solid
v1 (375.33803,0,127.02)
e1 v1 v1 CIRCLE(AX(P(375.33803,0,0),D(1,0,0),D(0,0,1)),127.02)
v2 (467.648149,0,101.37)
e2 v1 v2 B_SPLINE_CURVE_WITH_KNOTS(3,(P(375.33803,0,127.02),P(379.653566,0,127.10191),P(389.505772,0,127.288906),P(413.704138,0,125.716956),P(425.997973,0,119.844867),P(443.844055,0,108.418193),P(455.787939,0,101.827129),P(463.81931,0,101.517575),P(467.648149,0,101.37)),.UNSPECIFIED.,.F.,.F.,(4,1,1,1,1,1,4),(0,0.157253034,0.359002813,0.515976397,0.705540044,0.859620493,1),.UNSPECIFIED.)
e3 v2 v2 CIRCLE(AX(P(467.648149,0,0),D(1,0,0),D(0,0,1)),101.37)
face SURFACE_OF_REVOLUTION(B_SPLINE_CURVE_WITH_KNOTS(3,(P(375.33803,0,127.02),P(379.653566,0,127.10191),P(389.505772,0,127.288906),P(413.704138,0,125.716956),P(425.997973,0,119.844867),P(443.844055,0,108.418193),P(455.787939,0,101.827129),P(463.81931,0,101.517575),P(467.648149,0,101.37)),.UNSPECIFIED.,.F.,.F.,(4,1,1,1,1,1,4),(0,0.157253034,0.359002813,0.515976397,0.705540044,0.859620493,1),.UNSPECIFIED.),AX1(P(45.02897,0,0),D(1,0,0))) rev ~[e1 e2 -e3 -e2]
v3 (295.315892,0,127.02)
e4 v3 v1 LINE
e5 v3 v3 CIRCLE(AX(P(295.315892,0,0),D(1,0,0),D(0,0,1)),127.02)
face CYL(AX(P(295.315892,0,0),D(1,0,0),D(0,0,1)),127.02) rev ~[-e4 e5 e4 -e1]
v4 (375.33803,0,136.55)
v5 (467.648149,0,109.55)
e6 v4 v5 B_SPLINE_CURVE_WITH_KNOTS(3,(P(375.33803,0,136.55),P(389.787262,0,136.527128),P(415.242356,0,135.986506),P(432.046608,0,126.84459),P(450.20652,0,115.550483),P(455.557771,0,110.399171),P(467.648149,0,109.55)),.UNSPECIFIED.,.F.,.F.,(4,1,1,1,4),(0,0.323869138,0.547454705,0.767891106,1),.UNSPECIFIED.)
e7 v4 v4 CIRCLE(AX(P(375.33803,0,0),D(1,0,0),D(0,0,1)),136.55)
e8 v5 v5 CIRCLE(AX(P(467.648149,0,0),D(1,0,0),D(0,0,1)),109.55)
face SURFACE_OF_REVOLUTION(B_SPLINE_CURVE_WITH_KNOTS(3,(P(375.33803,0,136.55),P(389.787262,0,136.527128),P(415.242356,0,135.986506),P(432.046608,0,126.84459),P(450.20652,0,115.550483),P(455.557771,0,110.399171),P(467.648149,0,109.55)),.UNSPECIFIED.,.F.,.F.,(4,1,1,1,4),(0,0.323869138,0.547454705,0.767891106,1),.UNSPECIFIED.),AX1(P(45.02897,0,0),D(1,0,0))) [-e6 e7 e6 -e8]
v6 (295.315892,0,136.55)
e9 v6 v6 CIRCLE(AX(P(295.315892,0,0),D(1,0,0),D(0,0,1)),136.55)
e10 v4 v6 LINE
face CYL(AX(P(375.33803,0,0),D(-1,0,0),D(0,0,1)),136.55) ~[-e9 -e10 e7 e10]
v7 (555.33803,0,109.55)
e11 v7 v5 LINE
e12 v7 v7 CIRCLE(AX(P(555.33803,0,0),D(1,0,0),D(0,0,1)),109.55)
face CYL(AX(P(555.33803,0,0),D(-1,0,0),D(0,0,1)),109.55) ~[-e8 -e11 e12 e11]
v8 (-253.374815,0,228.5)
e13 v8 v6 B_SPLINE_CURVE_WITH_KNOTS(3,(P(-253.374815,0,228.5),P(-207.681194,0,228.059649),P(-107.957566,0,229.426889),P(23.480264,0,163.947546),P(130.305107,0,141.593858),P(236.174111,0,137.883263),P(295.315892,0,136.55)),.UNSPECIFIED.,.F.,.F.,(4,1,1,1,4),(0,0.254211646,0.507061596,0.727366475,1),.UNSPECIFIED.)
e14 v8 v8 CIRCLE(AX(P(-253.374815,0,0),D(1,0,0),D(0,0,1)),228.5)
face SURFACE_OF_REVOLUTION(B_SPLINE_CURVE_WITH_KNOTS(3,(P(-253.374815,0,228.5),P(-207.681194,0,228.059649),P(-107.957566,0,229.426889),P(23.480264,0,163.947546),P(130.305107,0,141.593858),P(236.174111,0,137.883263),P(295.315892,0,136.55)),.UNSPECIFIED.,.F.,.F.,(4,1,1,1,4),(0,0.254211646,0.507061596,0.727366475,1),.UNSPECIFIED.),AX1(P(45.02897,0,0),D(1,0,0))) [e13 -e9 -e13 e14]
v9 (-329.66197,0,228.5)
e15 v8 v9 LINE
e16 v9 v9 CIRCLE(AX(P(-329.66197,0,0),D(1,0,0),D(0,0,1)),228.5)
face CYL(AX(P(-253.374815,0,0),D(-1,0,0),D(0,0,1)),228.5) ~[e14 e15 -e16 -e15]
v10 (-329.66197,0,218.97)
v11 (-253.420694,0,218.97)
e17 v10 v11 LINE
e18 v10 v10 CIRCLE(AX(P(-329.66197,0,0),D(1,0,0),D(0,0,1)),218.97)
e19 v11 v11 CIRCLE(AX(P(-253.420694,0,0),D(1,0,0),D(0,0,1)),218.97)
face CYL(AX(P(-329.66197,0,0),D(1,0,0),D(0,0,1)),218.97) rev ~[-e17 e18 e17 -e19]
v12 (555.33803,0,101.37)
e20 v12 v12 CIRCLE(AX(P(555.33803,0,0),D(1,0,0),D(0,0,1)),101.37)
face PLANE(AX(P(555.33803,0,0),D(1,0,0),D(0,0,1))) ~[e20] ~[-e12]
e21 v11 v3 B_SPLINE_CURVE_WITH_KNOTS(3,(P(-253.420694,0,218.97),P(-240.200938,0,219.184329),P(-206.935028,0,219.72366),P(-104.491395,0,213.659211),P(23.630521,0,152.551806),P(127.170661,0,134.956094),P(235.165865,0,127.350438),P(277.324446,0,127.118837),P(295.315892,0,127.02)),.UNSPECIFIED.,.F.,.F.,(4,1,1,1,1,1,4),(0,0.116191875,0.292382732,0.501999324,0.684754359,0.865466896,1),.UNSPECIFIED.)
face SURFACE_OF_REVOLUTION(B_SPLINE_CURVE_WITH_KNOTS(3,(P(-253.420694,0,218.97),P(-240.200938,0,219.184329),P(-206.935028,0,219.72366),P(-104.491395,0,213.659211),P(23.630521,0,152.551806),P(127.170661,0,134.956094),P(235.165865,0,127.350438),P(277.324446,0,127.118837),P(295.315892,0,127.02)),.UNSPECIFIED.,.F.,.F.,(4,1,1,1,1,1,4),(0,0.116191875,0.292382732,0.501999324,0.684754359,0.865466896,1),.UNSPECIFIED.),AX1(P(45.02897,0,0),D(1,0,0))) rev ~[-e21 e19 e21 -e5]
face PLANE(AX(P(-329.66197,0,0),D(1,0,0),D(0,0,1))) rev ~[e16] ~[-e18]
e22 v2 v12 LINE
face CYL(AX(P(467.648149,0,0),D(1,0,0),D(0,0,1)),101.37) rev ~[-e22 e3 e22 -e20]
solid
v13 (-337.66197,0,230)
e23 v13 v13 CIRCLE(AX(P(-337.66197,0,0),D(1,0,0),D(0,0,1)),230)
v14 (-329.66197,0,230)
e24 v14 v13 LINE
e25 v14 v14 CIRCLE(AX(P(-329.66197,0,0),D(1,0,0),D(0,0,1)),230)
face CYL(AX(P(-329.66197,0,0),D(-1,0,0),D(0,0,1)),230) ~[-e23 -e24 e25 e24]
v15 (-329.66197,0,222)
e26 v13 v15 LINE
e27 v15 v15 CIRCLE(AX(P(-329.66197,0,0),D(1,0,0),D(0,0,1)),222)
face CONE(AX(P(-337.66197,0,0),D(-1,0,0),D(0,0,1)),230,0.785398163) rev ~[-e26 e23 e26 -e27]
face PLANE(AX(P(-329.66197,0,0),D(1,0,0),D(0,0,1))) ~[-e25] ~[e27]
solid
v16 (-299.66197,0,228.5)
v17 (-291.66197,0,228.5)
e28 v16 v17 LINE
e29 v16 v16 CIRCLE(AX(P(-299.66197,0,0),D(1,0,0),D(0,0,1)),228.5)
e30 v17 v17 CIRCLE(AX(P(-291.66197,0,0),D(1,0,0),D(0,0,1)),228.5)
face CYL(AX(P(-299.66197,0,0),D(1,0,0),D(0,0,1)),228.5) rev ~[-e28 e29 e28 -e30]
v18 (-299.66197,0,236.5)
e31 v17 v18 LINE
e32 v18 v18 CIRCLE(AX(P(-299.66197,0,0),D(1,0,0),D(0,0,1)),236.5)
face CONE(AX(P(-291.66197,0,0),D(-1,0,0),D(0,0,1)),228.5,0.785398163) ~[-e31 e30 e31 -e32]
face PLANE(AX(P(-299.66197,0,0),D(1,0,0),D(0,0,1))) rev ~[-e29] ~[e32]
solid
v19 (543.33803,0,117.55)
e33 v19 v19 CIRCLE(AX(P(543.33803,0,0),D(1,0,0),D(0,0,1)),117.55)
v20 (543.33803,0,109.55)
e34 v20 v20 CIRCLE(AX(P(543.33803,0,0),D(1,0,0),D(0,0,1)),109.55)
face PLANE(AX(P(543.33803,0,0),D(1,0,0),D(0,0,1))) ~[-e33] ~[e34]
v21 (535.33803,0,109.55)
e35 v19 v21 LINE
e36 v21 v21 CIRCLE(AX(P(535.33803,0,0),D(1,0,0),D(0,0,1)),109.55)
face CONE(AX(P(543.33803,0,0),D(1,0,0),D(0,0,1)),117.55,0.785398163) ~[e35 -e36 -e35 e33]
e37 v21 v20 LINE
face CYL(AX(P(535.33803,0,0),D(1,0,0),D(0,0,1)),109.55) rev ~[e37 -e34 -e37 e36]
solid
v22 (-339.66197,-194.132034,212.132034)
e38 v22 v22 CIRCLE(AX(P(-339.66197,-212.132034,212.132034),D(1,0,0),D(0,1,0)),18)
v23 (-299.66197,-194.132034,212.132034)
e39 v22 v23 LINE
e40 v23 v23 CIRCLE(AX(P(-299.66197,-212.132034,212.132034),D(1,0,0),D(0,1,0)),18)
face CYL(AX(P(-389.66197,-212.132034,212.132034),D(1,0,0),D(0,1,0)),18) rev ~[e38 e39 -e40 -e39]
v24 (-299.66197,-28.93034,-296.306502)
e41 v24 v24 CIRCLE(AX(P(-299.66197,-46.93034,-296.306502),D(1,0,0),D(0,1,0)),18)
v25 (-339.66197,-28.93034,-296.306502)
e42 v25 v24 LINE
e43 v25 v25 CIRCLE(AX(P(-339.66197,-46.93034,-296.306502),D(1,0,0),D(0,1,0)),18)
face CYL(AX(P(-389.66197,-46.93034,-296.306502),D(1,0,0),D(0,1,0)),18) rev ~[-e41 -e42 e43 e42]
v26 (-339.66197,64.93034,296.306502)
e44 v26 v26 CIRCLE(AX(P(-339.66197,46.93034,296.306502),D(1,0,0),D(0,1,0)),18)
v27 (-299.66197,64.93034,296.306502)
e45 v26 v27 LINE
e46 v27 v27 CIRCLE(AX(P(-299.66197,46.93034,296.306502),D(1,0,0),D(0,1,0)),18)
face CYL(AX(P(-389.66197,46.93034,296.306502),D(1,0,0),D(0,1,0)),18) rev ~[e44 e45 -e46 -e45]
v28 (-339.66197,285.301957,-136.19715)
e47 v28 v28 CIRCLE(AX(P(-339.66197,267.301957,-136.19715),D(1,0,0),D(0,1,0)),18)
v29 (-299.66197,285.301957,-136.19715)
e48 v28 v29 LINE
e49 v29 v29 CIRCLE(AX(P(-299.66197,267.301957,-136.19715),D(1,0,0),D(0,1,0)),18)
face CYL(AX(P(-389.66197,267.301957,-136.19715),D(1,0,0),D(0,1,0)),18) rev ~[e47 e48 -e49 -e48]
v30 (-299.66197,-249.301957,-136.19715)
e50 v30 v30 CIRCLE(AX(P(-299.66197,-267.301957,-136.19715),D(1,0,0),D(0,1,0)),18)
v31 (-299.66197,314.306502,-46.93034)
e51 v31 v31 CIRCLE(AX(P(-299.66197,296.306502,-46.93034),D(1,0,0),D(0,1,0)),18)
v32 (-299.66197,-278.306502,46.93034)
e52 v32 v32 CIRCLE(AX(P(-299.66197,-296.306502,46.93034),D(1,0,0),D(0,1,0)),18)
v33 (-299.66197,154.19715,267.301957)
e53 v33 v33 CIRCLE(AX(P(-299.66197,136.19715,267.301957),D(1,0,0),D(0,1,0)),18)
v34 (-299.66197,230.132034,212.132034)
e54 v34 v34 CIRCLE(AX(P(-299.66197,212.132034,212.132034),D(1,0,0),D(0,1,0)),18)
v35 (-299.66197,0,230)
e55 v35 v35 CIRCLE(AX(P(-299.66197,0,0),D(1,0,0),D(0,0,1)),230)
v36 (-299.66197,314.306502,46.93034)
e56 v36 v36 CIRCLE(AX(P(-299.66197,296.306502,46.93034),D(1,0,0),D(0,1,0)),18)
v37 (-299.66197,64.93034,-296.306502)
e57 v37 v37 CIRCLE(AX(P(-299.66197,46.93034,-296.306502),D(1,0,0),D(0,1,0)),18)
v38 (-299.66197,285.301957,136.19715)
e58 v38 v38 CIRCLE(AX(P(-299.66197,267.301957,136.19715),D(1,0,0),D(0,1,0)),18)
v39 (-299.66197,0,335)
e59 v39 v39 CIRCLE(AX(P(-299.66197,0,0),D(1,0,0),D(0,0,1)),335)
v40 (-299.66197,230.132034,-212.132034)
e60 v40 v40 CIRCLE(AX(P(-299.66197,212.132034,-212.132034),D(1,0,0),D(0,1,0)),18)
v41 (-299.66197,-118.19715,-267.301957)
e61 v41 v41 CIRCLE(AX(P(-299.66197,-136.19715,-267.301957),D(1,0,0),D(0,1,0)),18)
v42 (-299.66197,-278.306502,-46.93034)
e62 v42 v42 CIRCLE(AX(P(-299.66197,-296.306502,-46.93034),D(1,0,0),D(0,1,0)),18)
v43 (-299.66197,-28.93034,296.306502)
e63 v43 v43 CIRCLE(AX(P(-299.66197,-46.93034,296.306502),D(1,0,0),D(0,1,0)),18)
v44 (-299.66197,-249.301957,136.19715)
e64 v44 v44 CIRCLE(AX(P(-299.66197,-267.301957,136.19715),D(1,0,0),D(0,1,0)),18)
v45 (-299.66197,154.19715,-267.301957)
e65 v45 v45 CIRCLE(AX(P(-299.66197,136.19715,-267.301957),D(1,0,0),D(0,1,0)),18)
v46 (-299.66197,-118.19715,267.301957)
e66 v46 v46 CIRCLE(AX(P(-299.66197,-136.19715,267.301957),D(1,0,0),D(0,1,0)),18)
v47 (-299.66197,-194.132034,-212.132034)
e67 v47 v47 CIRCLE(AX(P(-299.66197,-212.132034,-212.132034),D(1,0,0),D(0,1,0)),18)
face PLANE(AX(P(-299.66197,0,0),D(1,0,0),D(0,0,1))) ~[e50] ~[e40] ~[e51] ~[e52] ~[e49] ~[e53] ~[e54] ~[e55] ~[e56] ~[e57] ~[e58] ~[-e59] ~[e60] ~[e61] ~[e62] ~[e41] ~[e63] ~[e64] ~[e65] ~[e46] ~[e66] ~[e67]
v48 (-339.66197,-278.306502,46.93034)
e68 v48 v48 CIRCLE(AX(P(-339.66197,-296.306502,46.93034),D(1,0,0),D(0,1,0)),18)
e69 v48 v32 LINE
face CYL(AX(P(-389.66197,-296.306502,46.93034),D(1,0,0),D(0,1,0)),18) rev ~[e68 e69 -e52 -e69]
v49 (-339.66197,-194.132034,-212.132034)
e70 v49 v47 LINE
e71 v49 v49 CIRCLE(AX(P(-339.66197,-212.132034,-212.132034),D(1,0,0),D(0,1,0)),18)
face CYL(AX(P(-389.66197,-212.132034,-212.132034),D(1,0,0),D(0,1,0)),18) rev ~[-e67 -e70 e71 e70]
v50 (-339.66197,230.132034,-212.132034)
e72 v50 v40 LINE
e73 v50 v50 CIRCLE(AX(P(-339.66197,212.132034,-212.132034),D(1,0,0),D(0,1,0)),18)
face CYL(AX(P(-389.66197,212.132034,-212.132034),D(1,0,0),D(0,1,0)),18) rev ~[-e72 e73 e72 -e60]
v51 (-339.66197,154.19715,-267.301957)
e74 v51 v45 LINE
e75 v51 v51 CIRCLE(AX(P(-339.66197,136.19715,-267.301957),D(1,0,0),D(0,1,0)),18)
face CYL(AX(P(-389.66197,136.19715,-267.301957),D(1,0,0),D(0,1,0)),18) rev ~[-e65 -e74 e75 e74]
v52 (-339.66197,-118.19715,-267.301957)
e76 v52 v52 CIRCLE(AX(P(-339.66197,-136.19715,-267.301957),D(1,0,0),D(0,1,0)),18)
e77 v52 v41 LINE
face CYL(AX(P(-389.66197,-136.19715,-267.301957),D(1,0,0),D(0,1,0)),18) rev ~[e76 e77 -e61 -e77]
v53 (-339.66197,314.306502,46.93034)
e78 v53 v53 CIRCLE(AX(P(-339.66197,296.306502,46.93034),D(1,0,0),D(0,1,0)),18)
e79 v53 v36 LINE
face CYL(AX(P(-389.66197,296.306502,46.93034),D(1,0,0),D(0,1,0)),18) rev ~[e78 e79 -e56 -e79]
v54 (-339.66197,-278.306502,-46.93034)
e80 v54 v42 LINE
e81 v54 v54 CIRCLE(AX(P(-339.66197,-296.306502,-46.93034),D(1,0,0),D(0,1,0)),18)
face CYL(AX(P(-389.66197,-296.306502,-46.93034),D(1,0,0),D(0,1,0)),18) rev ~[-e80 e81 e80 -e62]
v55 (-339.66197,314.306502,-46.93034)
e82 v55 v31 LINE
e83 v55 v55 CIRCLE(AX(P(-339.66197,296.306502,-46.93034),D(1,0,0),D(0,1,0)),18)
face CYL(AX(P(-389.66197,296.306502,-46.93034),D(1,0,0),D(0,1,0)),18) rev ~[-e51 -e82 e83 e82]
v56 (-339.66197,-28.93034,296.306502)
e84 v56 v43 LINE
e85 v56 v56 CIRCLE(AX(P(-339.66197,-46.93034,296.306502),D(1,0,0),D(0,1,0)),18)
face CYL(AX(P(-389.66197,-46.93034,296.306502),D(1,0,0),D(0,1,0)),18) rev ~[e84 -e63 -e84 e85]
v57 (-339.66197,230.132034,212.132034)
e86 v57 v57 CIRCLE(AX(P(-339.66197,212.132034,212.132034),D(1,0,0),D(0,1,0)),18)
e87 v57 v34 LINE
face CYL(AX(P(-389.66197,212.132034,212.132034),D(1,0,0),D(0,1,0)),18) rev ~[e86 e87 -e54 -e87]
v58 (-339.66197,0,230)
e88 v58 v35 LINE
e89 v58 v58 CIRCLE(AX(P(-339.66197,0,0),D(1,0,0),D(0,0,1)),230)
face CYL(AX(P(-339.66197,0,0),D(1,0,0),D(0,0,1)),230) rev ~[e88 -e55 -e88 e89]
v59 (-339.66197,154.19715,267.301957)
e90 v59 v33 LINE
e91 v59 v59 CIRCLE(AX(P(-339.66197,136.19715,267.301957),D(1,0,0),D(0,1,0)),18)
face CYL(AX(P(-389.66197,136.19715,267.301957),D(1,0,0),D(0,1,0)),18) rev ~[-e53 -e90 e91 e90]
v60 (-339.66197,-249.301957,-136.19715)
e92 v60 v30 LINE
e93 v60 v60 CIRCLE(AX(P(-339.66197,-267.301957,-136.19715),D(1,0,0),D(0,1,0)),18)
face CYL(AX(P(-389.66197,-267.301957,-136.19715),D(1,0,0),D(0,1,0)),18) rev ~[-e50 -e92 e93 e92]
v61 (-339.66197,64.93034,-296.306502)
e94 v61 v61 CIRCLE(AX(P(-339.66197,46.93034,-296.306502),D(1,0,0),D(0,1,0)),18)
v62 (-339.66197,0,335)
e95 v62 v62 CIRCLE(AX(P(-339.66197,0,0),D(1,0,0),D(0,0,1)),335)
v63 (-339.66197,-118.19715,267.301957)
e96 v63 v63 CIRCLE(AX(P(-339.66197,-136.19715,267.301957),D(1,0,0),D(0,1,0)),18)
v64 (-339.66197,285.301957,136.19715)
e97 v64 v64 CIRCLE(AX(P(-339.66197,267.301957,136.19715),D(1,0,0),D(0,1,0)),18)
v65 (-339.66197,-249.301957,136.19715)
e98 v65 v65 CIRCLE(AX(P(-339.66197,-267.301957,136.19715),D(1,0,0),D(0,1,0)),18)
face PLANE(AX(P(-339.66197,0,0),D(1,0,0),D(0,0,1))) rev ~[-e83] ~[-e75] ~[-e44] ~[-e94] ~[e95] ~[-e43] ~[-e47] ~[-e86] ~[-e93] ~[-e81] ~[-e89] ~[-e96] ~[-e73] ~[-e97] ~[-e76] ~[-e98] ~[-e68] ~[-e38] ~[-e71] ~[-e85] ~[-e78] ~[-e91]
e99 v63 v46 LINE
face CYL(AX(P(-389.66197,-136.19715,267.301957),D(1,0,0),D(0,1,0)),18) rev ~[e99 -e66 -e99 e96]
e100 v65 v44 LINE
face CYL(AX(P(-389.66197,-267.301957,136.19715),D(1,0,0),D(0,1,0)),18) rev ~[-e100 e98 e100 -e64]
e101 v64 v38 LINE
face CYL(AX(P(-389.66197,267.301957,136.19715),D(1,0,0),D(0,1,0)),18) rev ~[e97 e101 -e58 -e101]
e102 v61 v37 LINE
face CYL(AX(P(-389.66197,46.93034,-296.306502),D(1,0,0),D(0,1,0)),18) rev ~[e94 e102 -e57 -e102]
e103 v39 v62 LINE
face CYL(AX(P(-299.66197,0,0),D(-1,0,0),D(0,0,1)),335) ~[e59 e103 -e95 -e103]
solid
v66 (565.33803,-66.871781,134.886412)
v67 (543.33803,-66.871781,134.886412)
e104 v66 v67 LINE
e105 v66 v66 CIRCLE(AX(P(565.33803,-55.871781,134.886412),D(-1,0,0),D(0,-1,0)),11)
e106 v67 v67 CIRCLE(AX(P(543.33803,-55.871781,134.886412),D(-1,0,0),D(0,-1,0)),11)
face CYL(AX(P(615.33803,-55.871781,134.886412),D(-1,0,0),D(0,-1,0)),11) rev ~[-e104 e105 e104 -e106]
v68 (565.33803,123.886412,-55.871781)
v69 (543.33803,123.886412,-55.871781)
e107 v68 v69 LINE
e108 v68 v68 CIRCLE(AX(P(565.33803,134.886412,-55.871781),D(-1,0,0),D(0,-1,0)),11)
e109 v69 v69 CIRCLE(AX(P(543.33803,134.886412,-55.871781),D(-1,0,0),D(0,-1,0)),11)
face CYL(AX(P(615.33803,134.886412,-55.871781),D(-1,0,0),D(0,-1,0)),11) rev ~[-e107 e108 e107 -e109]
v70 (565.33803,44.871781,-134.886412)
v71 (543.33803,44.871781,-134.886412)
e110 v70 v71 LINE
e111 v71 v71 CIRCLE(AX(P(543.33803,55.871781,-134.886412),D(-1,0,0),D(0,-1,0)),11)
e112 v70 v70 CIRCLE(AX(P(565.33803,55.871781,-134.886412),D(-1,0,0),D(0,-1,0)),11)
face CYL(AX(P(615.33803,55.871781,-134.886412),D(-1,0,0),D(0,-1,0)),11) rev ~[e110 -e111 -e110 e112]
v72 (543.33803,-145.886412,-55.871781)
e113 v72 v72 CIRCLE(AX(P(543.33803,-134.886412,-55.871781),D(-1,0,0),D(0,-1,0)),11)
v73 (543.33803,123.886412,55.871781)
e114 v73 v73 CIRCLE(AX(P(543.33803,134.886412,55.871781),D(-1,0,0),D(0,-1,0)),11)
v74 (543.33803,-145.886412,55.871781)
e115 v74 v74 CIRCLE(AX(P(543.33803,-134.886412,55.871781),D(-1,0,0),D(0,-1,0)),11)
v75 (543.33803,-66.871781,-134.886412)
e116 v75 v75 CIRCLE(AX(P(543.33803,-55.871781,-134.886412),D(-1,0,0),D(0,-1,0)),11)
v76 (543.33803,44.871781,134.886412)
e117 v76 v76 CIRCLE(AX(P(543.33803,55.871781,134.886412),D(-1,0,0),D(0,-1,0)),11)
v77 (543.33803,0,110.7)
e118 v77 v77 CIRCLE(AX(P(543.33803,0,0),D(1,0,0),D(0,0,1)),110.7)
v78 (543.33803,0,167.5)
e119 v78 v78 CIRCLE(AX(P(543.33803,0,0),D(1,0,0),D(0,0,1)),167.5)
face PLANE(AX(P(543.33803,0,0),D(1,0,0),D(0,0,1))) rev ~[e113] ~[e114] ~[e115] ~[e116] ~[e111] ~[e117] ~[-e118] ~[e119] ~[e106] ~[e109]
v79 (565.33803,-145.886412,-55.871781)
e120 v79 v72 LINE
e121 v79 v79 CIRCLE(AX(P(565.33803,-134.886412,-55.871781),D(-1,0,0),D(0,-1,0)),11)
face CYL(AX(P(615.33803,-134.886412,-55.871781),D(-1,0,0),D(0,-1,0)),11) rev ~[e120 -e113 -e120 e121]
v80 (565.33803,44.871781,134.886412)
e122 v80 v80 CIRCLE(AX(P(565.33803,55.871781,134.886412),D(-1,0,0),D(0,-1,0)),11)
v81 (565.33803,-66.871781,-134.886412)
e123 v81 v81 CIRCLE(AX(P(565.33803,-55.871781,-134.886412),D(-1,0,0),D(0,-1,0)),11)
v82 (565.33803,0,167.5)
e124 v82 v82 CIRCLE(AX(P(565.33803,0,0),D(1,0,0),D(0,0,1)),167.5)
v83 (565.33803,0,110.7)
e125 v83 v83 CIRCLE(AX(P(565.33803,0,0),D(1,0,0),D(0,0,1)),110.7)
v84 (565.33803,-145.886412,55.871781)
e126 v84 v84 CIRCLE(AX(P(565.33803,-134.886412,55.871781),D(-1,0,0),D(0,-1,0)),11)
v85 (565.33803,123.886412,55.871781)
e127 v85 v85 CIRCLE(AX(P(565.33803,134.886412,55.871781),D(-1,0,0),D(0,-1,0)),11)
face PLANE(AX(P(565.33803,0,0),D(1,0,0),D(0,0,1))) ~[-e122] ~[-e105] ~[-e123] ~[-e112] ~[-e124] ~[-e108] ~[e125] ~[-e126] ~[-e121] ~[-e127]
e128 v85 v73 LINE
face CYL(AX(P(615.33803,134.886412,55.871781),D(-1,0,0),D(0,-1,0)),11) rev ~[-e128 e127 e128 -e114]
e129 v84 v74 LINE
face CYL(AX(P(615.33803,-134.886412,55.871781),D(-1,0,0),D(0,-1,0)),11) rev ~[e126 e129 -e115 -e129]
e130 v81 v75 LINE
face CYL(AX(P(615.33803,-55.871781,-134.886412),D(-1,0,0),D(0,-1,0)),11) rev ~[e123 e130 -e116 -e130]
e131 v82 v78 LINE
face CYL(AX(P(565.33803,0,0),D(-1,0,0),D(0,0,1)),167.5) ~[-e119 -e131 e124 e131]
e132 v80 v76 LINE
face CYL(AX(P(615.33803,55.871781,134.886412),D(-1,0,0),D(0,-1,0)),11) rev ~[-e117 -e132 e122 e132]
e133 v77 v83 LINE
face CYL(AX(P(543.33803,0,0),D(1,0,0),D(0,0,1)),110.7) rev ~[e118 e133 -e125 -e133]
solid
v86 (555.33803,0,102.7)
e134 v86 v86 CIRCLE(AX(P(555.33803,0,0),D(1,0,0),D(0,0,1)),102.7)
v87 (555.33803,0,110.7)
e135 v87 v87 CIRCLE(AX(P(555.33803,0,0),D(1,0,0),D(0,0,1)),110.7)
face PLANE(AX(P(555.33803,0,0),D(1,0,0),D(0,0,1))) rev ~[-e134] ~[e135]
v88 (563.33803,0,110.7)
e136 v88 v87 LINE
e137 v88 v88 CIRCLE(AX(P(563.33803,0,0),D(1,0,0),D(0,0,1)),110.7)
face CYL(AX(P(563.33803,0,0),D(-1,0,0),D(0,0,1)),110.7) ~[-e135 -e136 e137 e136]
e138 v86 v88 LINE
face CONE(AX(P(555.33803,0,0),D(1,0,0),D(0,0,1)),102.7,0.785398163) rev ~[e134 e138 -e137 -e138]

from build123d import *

# Parameters (mm, degrees)
F5_D      = 36
F5_DEPTH  = 50
F5_TIP    = 10.8154911425
F10_D     = 22
F10_DEPTH = 50
F10_TIP   = 6.6094668093


# Not quite as in the source:
# - a feature names something its author has since deleted; it is built from what else it names


with BuildPart() as f1:
    # F0 (on Front) → F1 (revolve)
    with BuildSketch(Plane.XZ):
        Polygon((-337.6619696266, 230), (-329.6619696266, 230), (-299.6619696266, 230), (-299.6619696266, 236.5), (-299.6619696266, 335), (-339.6619696266, 335), (-339.6619696266, 230), align=None)
    revolve(axis=Axis((45.028969672, 0, 0), (1, 0, 0)))

    # F5
    with Locations(Plane(origin=(-339.6619696266, 0, 0), x_dir=(0, -1, 0), z_dir=(-1, 0, 0))):
        with Locations((-46.9303395121, 296.3065021785), (46.9303395121, 296.3065021785), (136.1971499219, 267.3019572565), (212.132034356, 212.132034356), (267.3019572565, 136.1971499219), (296.3065021785, 46.9303395121), (296.3065021785, -46.9303395121), (267.3019572565, -136.1971499219), (212.132034356, -212.132034356), (136.1971499219, -267.3019572565), (46.9303395121, -296.3065021785), (-136.1971499219, -267.3019572565), (-212.132034356, -212.132034356), (-267.3019572565, -136.1971499219), (-296.3065021785, -46.9303395121), (-46.9303395121, -296.3065021785), (-296.3065021785, 46.9303395121), (-267.3019572565, 136.1971499219), (-212.132034356, 212.132034356), (-136.1971499219, 267.3019572565)):
            Hole(F5_D / 2, depth=F5_DEPTH)
            with Locations((0, 0, -(F5_DEPTH + F5_TIP / 2))):  # 118° drill point
                Cone(0, F5_D / 2, F5_TIP, mode=Mode.SUBTRACT)


with BuildPart() as f2:
    # F0 (on Front) → F2 (revolve)
    with BuildSketch(Plane.XZ):
        with BuildLine():
            add(Edge.make_bspline(
                [(-253.3748149872, 228.5), (-207.6811939478, 228.0596494675), (-107.9575658009, 229.4268890138), (23.480264241, 163.9475460602), (130.3051072184, 141.5938575123), (236.1741111698, 137.8832627127), (295.3158915043, 136.55)],
                knots=[0, 0, 0, 0, 0.2542116463, 0.5070615956, 0.7273664746, 1, 1, 1, 1], degree=3))
            Line((-253.3748149872, 228.5), (-253.4206936962, 218.97))
            add(Edge.make_bspline(
                [(-253.4206936962, 218.97), (-240.2009376391, 219.1843285332), (-206.9350282777, 219.7236602371), (-104.4913953456, 213.6592114843), (23.6305209991, 152.5518060653), (127.1706610346, 134.9560944534), (235.1658650843, 127.3504382511), (277.3244460023, 127.1188372265), (295.3158915043, 127.02)],
                knots=[0, 0, 0, 0, 0.1161918754, 0.2923827322, 0.5019993241, 0.6847543592, 0.8654668957, 1, 1, 1, 1], degree=3))
            Line((295.3158915043, 127.02), (375.3380303734, 127.02))
            Line((375.3380303734, 127.02), (375.3380303734, 136.55))
            Line((375.3380303734, 136.55), (295.3158915043, 136.55))
        make_face()
        Polygon((-299.6619696266, 228.5), (-329.6619696266, 228.5), (-329.6619696266, 222), (-329.6619696266, 218.97), (-253.4206936962, 218.97), (-253.3748149872, 228.5), (-291.6619696266, 228.5), align=None)
    revolve(axis=Axis((45.028969672, 0, 0), (1, 0, 0)))

    # F0 (on Front) → F6 (revolve)
    with BuildSketch(Plane.XZ):
        Polygon((535.3380303734, 109.55), (467.6481485367, 109.55), (467.6481485367, 101.37), (555.3380303734, 101.37), (555.3380303734, 102.7), (555.3380303734, 109.55), (543.3380303734, 109.55), align=None)
        with BuildLine():
            add(Edge.make_bspline(
                [(375.3380303734, 136.55), (389.7872619021, 136.5271284103), (415.2423562214, 135.9865060076), (432.0466082032, 126.8445897583), (450.2065197701, 115.5504833836), (455.557771098, 110.3991705165), (467.6481485367, 109.55)],
                knots=[0, 0, 0, 0, 0.3238691381, 0.547454705, 0.7678911056, 1, 1, 1, 1], degree=3))
            Line((375.3380303734, 136.55), (375.3380303734, 127.02))
            add(Edge.make_bspline(
                [(375.3380303734, 127.02), (379.6535656436, 127.1019095607), (389.5057717451, 127.2889060336), (413.704138146, 125.7169560852), (425.9979727104, 119.8448667946), (443.8440547181, 108.4181927763), (455.7879394789, 101.8271287701), (463.8193095231, 101.5175751785), (467.6481485367, 101.37)],
                knots=[0, 0, 0, 0, 0.1572530342, 0.3590028132, 0.5159763971, 0.7055400439, 0.8596204929, 1, 1, 1, 1], degree=3))
            Line((467.6481485367, 101.37), (467.6481485367, 109.55))
        make_face()
    revolve(axis=Axis((45.028969672, 0, 0), (1, 0, 0)))


with BuildPart() as f3:
    # F0 (on Front) → F3 (revolve)
    with BuildSketch(Plane.XZ):
        Polygon((-329.6619696266, 222), (-329.6619696266, 228.5), (-329.6619696266, 230), (-337.6619696266, 230), align=None)
    revolve(axis=Axis((45.028969672, 0, 0), (1, 0, 0)))


with BuildPart() as f3b:
    # F0 (on Front) → F3, piece 2 (revolve)
    with BuildSketch(Plane.XZ):
        Polygon((-299.6619696266, 230), (-299.6619696266, 228.5), (-291.6619696266, 228.5), (-299.6619696266, 236.5), align=None)
    revolve(axis=Axis((45.028969672, 0, 0), (1, 0, 0)))


with BuildPart() as f7:
    # F0 (on Front) → F7 (revolve)
    with BuildSketch(Plane.XZ):
        Polygon((543.3380303734, 167.5), (543.3380303734, 117.55), (543.3380303734, 110.7), (555.3380303734, 110.7), (563.3380303734, 110.7), (565.3380303734, 110.7), (565.3380303734, 167.5), align=None)
    revolve(axis=Axis((45.028969672, 0, 0), (1, 0, 0)))

    # F10
    with Locations(Plane.YZ.offset(565.3380303734)):
        with Locations((134.8864117466, 55.8717811253), (134.8864117466, -55.8717811253), (55.8717811253, -134.8864117466), (-55.8717811253, -134.8864117466), (-134.8864117466, -55.8717811253), (-134.8864117466, 55.8717811253), (-55.8717811253, 134.8864117466), (55.8717811253, 134.8864117466)):
            Hole(F10_D / 2, depth=F10_DEPTH)
            with Locations((0, 0, -(F10_DEPTH + F10_TIP / 2))):  # 118° drill point
                Cone(0, F10_D / 2, F10_TIP, mode=Mode.SUBTRACT)


with BuildPart() as f8:
    # F0 (on Front) → F8 (revolve)
    with BuildSketch(Plane.XZ):
        Polygon((543.3380303734, 117.55), (535.3380303734, 109.55), (543.3380303734, 109.55), (543.3380303734, 110.7), align=None)
    revolve(axis=Axis((45.028969672, 0, 0), (1, 0, 0)))


with BuildPart() as f8b:
    # F0 (on Front) → F8, piece 2 (revolve)
    with BuildSketch(Plane.XZ):
        Polygon((555.3380303734, 109.55), (555.3380303734, 102.7), (563.3380303734, 110.7), (555.3380303734, 110.7), align=None)
    revolve(axis=Axis((45.028969672, 0, 0), (1, 0, 0)))


solid = Compound([f1.part, f2.part, f3.part, f3b.part, f7.part, f8.part, f8b.part])
